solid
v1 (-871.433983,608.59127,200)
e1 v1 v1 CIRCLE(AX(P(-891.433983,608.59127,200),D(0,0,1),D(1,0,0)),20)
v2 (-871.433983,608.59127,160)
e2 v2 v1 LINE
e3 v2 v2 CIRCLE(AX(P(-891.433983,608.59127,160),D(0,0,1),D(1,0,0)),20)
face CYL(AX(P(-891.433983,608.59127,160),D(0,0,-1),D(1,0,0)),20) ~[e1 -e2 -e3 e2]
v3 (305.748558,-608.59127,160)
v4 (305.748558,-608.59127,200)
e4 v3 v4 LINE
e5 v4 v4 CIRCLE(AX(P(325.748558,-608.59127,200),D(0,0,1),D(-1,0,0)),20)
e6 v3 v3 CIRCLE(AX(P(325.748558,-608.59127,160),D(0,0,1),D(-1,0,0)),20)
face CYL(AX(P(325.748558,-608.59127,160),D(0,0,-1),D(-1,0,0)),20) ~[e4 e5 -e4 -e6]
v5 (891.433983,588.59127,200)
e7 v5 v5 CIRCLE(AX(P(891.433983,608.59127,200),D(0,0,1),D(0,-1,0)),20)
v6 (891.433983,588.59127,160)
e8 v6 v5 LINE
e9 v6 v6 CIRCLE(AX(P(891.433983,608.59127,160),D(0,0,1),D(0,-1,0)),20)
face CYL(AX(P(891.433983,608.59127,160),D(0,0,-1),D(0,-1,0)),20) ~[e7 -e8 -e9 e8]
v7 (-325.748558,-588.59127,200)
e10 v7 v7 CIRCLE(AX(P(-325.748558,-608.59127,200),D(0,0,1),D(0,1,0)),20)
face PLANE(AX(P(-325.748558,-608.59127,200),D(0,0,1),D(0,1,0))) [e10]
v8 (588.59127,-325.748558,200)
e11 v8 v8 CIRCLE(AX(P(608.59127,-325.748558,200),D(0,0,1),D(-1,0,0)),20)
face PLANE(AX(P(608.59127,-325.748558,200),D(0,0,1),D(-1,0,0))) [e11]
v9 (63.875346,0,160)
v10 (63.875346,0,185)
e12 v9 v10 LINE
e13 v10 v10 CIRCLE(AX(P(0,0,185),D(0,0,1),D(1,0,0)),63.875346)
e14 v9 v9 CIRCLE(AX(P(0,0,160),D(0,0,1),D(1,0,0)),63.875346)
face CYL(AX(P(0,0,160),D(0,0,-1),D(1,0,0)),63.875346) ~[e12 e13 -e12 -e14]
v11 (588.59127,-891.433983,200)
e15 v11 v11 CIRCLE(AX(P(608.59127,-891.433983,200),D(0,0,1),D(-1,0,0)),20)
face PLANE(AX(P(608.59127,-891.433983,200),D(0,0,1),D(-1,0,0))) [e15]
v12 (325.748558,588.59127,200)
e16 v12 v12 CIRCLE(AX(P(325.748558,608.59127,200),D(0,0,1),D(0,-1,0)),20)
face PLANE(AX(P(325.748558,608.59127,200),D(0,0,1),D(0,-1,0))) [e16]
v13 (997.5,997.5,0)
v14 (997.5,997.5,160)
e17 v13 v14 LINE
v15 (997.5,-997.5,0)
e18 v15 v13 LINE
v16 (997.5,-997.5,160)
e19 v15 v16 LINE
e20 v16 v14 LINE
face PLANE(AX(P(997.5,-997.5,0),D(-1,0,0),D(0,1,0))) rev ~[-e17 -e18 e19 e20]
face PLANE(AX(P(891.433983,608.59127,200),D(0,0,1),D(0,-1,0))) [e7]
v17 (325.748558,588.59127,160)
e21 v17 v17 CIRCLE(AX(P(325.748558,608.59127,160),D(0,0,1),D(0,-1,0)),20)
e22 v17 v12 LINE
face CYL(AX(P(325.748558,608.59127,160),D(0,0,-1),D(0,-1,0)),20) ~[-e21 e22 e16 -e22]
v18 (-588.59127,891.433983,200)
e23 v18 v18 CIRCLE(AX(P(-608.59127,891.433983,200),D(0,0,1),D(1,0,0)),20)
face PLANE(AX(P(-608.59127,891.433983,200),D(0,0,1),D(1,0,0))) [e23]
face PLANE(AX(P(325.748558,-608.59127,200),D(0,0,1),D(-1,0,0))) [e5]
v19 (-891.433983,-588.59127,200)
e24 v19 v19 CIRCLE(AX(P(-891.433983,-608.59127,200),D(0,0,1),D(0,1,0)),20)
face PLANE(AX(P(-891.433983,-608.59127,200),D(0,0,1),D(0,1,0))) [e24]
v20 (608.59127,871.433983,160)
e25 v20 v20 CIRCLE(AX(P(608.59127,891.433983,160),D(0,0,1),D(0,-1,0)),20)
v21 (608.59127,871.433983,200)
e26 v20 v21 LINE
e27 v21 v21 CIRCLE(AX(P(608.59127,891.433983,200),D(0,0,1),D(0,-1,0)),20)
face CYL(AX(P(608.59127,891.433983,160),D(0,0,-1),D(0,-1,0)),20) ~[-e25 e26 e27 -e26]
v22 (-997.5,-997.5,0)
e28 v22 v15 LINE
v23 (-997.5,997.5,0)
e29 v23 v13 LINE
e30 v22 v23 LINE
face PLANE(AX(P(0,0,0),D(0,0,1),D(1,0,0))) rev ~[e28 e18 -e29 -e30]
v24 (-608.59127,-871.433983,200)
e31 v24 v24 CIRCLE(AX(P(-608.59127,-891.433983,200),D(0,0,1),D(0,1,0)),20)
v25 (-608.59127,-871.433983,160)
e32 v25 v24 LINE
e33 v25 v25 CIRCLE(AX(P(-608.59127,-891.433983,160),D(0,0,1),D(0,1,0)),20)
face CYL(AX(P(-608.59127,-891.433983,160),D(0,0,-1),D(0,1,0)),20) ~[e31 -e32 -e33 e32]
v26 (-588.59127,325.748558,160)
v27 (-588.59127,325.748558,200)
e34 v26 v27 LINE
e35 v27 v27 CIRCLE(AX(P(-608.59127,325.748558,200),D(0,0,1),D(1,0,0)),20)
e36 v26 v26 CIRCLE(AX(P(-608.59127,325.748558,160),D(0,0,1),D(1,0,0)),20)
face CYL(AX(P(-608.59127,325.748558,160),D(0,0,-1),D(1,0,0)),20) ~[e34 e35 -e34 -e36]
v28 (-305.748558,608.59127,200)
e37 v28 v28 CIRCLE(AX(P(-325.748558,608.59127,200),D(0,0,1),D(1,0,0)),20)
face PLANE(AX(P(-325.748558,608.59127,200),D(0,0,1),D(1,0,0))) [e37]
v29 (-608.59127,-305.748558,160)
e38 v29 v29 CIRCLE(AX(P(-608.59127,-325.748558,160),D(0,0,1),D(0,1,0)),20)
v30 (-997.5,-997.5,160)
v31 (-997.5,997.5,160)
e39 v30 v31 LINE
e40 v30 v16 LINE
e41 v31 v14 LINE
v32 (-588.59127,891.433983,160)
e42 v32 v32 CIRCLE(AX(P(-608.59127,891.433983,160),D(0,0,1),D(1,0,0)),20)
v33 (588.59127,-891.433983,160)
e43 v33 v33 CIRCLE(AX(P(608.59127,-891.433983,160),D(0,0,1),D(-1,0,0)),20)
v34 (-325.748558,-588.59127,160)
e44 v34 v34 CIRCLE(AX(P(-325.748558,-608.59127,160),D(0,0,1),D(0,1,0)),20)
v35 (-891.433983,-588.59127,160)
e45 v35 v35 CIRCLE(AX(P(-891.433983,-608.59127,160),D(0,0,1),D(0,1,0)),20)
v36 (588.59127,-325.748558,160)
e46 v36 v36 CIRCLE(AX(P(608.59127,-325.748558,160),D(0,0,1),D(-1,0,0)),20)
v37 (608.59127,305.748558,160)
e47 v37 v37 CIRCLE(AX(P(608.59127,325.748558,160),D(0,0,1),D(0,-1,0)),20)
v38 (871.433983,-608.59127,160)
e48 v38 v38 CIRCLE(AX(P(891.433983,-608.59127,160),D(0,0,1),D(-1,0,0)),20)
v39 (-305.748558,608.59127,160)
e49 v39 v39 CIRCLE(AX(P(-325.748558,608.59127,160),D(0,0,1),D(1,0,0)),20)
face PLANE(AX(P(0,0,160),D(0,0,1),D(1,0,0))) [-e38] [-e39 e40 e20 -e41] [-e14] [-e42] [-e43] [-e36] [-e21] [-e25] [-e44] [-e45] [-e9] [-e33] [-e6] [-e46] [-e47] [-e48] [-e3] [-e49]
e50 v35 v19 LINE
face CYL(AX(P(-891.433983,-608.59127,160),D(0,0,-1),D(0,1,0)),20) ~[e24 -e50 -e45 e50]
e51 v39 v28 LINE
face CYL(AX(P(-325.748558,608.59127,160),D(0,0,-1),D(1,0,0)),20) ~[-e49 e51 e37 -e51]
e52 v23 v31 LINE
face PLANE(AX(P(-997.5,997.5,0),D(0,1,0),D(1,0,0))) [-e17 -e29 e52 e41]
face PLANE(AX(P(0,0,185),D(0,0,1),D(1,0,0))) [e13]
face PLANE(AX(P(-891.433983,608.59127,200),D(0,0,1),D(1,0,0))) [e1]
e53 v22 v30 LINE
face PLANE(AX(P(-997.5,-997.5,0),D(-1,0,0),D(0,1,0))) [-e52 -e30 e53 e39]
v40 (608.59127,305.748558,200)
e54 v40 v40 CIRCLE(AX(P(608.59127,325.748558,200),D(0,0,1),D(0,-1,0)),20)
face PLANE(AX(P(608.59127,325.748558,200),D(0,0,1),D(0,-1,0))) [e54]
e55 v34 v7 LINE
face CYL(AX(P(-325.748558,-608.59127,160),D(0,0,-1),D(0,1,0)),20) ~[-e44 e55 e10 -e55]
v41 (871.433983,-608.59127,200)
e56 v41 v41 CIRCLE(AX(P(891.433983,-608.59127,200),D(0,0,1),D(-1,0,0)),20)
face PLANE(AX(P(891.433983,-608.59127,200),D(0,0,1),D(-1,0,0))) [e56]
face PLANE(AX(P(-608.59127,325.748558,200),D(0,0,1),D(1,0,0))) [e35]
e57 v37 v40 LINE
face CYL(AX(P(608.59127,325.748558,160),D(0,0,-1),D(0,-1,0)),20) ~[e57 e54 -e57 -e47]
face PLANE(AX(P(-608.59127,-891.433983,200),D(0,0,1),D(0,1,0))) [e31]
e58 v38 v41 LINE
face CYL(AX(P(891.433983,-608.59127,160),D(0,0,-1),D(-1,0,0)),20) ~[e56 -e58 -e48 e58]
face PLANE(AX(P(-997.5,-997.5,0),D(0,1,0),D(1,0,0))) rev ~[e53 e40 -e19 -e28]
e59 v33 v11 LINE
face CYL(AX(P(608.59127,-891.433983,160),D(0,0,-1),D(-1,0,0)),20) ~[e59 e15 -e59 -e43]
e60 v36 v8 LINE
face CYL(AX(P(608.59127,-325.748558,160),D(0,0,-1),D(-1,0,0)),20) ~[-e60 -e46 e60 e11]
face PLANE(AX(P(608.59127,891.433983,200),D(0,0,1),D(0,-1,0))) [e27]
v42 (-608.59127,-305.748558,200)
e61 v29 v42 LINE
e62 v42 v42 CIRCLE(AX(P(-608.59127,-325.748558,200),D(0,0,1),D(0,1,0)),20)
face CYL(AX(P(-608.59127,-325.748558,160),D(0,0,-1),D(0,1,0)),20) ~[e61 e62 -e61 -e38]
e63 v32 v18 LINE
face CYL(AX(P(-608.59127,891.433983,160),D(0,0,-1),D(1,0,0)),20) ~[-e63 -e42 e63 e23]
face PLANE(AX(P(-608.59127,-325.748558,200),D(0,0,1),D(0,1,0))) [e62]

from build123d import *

# Parameters (mm, degrees)
F0_W            = 1995
F0_H            = 1995
F1_DEPTH        = 160
F2_R            = 20
F3_DEPTH        = 40
F3_COPIES_COUNT = 4
F4_R            = 63.875346373
F5_DEPTH        = 25


# Not quite as in the source:
# - a pattern or mirror of a feature is missing from the dataset's text; its kind, count and spacing are read off the source's solid


with BuildPart() as f1:
    # F0 (on Top) → F1 (new body)
    with BuildSketch(Plane.XY):
        Rectangle(F0_W, F0_H)
    extrude(amount=F1_DEPTH)

    # F2 (on face) → F3 (join)
    with BuildSketch(Plane.XY.offset(160)):
        with Locations((-608.5912703474, 891.433982822)):
            Circle(F2_R)
        with Locations((-325.7485578728, 608.5912703474)):
            Circle(F2_R)
        with Locations((-608.5912703474, 325.7485578728)):
            Circle(F2_R)
        with Locations((-891.433982822, 608.5912703474)):
            Circle(F2_R)
    f3 = extrude(amount=F3_DEPTH)

    # F3_copies: F3 ×4 about axis
    f3_copies_axis = Axis((0, 0, 0), (0, 0, 1))
    for i in range(1, F3_COPIES_COUNT):
        add(f3.rotate(f3_copies_axis, i * 360 / F3_COPIES_COUNT))

    # F4 (on face) → F5 (join)
    with BuildSketch(Plane.XY.offset(160)):
        Circle(F4_R)
    extrude(amount=F5_DEPTH)


solid = f1.part
